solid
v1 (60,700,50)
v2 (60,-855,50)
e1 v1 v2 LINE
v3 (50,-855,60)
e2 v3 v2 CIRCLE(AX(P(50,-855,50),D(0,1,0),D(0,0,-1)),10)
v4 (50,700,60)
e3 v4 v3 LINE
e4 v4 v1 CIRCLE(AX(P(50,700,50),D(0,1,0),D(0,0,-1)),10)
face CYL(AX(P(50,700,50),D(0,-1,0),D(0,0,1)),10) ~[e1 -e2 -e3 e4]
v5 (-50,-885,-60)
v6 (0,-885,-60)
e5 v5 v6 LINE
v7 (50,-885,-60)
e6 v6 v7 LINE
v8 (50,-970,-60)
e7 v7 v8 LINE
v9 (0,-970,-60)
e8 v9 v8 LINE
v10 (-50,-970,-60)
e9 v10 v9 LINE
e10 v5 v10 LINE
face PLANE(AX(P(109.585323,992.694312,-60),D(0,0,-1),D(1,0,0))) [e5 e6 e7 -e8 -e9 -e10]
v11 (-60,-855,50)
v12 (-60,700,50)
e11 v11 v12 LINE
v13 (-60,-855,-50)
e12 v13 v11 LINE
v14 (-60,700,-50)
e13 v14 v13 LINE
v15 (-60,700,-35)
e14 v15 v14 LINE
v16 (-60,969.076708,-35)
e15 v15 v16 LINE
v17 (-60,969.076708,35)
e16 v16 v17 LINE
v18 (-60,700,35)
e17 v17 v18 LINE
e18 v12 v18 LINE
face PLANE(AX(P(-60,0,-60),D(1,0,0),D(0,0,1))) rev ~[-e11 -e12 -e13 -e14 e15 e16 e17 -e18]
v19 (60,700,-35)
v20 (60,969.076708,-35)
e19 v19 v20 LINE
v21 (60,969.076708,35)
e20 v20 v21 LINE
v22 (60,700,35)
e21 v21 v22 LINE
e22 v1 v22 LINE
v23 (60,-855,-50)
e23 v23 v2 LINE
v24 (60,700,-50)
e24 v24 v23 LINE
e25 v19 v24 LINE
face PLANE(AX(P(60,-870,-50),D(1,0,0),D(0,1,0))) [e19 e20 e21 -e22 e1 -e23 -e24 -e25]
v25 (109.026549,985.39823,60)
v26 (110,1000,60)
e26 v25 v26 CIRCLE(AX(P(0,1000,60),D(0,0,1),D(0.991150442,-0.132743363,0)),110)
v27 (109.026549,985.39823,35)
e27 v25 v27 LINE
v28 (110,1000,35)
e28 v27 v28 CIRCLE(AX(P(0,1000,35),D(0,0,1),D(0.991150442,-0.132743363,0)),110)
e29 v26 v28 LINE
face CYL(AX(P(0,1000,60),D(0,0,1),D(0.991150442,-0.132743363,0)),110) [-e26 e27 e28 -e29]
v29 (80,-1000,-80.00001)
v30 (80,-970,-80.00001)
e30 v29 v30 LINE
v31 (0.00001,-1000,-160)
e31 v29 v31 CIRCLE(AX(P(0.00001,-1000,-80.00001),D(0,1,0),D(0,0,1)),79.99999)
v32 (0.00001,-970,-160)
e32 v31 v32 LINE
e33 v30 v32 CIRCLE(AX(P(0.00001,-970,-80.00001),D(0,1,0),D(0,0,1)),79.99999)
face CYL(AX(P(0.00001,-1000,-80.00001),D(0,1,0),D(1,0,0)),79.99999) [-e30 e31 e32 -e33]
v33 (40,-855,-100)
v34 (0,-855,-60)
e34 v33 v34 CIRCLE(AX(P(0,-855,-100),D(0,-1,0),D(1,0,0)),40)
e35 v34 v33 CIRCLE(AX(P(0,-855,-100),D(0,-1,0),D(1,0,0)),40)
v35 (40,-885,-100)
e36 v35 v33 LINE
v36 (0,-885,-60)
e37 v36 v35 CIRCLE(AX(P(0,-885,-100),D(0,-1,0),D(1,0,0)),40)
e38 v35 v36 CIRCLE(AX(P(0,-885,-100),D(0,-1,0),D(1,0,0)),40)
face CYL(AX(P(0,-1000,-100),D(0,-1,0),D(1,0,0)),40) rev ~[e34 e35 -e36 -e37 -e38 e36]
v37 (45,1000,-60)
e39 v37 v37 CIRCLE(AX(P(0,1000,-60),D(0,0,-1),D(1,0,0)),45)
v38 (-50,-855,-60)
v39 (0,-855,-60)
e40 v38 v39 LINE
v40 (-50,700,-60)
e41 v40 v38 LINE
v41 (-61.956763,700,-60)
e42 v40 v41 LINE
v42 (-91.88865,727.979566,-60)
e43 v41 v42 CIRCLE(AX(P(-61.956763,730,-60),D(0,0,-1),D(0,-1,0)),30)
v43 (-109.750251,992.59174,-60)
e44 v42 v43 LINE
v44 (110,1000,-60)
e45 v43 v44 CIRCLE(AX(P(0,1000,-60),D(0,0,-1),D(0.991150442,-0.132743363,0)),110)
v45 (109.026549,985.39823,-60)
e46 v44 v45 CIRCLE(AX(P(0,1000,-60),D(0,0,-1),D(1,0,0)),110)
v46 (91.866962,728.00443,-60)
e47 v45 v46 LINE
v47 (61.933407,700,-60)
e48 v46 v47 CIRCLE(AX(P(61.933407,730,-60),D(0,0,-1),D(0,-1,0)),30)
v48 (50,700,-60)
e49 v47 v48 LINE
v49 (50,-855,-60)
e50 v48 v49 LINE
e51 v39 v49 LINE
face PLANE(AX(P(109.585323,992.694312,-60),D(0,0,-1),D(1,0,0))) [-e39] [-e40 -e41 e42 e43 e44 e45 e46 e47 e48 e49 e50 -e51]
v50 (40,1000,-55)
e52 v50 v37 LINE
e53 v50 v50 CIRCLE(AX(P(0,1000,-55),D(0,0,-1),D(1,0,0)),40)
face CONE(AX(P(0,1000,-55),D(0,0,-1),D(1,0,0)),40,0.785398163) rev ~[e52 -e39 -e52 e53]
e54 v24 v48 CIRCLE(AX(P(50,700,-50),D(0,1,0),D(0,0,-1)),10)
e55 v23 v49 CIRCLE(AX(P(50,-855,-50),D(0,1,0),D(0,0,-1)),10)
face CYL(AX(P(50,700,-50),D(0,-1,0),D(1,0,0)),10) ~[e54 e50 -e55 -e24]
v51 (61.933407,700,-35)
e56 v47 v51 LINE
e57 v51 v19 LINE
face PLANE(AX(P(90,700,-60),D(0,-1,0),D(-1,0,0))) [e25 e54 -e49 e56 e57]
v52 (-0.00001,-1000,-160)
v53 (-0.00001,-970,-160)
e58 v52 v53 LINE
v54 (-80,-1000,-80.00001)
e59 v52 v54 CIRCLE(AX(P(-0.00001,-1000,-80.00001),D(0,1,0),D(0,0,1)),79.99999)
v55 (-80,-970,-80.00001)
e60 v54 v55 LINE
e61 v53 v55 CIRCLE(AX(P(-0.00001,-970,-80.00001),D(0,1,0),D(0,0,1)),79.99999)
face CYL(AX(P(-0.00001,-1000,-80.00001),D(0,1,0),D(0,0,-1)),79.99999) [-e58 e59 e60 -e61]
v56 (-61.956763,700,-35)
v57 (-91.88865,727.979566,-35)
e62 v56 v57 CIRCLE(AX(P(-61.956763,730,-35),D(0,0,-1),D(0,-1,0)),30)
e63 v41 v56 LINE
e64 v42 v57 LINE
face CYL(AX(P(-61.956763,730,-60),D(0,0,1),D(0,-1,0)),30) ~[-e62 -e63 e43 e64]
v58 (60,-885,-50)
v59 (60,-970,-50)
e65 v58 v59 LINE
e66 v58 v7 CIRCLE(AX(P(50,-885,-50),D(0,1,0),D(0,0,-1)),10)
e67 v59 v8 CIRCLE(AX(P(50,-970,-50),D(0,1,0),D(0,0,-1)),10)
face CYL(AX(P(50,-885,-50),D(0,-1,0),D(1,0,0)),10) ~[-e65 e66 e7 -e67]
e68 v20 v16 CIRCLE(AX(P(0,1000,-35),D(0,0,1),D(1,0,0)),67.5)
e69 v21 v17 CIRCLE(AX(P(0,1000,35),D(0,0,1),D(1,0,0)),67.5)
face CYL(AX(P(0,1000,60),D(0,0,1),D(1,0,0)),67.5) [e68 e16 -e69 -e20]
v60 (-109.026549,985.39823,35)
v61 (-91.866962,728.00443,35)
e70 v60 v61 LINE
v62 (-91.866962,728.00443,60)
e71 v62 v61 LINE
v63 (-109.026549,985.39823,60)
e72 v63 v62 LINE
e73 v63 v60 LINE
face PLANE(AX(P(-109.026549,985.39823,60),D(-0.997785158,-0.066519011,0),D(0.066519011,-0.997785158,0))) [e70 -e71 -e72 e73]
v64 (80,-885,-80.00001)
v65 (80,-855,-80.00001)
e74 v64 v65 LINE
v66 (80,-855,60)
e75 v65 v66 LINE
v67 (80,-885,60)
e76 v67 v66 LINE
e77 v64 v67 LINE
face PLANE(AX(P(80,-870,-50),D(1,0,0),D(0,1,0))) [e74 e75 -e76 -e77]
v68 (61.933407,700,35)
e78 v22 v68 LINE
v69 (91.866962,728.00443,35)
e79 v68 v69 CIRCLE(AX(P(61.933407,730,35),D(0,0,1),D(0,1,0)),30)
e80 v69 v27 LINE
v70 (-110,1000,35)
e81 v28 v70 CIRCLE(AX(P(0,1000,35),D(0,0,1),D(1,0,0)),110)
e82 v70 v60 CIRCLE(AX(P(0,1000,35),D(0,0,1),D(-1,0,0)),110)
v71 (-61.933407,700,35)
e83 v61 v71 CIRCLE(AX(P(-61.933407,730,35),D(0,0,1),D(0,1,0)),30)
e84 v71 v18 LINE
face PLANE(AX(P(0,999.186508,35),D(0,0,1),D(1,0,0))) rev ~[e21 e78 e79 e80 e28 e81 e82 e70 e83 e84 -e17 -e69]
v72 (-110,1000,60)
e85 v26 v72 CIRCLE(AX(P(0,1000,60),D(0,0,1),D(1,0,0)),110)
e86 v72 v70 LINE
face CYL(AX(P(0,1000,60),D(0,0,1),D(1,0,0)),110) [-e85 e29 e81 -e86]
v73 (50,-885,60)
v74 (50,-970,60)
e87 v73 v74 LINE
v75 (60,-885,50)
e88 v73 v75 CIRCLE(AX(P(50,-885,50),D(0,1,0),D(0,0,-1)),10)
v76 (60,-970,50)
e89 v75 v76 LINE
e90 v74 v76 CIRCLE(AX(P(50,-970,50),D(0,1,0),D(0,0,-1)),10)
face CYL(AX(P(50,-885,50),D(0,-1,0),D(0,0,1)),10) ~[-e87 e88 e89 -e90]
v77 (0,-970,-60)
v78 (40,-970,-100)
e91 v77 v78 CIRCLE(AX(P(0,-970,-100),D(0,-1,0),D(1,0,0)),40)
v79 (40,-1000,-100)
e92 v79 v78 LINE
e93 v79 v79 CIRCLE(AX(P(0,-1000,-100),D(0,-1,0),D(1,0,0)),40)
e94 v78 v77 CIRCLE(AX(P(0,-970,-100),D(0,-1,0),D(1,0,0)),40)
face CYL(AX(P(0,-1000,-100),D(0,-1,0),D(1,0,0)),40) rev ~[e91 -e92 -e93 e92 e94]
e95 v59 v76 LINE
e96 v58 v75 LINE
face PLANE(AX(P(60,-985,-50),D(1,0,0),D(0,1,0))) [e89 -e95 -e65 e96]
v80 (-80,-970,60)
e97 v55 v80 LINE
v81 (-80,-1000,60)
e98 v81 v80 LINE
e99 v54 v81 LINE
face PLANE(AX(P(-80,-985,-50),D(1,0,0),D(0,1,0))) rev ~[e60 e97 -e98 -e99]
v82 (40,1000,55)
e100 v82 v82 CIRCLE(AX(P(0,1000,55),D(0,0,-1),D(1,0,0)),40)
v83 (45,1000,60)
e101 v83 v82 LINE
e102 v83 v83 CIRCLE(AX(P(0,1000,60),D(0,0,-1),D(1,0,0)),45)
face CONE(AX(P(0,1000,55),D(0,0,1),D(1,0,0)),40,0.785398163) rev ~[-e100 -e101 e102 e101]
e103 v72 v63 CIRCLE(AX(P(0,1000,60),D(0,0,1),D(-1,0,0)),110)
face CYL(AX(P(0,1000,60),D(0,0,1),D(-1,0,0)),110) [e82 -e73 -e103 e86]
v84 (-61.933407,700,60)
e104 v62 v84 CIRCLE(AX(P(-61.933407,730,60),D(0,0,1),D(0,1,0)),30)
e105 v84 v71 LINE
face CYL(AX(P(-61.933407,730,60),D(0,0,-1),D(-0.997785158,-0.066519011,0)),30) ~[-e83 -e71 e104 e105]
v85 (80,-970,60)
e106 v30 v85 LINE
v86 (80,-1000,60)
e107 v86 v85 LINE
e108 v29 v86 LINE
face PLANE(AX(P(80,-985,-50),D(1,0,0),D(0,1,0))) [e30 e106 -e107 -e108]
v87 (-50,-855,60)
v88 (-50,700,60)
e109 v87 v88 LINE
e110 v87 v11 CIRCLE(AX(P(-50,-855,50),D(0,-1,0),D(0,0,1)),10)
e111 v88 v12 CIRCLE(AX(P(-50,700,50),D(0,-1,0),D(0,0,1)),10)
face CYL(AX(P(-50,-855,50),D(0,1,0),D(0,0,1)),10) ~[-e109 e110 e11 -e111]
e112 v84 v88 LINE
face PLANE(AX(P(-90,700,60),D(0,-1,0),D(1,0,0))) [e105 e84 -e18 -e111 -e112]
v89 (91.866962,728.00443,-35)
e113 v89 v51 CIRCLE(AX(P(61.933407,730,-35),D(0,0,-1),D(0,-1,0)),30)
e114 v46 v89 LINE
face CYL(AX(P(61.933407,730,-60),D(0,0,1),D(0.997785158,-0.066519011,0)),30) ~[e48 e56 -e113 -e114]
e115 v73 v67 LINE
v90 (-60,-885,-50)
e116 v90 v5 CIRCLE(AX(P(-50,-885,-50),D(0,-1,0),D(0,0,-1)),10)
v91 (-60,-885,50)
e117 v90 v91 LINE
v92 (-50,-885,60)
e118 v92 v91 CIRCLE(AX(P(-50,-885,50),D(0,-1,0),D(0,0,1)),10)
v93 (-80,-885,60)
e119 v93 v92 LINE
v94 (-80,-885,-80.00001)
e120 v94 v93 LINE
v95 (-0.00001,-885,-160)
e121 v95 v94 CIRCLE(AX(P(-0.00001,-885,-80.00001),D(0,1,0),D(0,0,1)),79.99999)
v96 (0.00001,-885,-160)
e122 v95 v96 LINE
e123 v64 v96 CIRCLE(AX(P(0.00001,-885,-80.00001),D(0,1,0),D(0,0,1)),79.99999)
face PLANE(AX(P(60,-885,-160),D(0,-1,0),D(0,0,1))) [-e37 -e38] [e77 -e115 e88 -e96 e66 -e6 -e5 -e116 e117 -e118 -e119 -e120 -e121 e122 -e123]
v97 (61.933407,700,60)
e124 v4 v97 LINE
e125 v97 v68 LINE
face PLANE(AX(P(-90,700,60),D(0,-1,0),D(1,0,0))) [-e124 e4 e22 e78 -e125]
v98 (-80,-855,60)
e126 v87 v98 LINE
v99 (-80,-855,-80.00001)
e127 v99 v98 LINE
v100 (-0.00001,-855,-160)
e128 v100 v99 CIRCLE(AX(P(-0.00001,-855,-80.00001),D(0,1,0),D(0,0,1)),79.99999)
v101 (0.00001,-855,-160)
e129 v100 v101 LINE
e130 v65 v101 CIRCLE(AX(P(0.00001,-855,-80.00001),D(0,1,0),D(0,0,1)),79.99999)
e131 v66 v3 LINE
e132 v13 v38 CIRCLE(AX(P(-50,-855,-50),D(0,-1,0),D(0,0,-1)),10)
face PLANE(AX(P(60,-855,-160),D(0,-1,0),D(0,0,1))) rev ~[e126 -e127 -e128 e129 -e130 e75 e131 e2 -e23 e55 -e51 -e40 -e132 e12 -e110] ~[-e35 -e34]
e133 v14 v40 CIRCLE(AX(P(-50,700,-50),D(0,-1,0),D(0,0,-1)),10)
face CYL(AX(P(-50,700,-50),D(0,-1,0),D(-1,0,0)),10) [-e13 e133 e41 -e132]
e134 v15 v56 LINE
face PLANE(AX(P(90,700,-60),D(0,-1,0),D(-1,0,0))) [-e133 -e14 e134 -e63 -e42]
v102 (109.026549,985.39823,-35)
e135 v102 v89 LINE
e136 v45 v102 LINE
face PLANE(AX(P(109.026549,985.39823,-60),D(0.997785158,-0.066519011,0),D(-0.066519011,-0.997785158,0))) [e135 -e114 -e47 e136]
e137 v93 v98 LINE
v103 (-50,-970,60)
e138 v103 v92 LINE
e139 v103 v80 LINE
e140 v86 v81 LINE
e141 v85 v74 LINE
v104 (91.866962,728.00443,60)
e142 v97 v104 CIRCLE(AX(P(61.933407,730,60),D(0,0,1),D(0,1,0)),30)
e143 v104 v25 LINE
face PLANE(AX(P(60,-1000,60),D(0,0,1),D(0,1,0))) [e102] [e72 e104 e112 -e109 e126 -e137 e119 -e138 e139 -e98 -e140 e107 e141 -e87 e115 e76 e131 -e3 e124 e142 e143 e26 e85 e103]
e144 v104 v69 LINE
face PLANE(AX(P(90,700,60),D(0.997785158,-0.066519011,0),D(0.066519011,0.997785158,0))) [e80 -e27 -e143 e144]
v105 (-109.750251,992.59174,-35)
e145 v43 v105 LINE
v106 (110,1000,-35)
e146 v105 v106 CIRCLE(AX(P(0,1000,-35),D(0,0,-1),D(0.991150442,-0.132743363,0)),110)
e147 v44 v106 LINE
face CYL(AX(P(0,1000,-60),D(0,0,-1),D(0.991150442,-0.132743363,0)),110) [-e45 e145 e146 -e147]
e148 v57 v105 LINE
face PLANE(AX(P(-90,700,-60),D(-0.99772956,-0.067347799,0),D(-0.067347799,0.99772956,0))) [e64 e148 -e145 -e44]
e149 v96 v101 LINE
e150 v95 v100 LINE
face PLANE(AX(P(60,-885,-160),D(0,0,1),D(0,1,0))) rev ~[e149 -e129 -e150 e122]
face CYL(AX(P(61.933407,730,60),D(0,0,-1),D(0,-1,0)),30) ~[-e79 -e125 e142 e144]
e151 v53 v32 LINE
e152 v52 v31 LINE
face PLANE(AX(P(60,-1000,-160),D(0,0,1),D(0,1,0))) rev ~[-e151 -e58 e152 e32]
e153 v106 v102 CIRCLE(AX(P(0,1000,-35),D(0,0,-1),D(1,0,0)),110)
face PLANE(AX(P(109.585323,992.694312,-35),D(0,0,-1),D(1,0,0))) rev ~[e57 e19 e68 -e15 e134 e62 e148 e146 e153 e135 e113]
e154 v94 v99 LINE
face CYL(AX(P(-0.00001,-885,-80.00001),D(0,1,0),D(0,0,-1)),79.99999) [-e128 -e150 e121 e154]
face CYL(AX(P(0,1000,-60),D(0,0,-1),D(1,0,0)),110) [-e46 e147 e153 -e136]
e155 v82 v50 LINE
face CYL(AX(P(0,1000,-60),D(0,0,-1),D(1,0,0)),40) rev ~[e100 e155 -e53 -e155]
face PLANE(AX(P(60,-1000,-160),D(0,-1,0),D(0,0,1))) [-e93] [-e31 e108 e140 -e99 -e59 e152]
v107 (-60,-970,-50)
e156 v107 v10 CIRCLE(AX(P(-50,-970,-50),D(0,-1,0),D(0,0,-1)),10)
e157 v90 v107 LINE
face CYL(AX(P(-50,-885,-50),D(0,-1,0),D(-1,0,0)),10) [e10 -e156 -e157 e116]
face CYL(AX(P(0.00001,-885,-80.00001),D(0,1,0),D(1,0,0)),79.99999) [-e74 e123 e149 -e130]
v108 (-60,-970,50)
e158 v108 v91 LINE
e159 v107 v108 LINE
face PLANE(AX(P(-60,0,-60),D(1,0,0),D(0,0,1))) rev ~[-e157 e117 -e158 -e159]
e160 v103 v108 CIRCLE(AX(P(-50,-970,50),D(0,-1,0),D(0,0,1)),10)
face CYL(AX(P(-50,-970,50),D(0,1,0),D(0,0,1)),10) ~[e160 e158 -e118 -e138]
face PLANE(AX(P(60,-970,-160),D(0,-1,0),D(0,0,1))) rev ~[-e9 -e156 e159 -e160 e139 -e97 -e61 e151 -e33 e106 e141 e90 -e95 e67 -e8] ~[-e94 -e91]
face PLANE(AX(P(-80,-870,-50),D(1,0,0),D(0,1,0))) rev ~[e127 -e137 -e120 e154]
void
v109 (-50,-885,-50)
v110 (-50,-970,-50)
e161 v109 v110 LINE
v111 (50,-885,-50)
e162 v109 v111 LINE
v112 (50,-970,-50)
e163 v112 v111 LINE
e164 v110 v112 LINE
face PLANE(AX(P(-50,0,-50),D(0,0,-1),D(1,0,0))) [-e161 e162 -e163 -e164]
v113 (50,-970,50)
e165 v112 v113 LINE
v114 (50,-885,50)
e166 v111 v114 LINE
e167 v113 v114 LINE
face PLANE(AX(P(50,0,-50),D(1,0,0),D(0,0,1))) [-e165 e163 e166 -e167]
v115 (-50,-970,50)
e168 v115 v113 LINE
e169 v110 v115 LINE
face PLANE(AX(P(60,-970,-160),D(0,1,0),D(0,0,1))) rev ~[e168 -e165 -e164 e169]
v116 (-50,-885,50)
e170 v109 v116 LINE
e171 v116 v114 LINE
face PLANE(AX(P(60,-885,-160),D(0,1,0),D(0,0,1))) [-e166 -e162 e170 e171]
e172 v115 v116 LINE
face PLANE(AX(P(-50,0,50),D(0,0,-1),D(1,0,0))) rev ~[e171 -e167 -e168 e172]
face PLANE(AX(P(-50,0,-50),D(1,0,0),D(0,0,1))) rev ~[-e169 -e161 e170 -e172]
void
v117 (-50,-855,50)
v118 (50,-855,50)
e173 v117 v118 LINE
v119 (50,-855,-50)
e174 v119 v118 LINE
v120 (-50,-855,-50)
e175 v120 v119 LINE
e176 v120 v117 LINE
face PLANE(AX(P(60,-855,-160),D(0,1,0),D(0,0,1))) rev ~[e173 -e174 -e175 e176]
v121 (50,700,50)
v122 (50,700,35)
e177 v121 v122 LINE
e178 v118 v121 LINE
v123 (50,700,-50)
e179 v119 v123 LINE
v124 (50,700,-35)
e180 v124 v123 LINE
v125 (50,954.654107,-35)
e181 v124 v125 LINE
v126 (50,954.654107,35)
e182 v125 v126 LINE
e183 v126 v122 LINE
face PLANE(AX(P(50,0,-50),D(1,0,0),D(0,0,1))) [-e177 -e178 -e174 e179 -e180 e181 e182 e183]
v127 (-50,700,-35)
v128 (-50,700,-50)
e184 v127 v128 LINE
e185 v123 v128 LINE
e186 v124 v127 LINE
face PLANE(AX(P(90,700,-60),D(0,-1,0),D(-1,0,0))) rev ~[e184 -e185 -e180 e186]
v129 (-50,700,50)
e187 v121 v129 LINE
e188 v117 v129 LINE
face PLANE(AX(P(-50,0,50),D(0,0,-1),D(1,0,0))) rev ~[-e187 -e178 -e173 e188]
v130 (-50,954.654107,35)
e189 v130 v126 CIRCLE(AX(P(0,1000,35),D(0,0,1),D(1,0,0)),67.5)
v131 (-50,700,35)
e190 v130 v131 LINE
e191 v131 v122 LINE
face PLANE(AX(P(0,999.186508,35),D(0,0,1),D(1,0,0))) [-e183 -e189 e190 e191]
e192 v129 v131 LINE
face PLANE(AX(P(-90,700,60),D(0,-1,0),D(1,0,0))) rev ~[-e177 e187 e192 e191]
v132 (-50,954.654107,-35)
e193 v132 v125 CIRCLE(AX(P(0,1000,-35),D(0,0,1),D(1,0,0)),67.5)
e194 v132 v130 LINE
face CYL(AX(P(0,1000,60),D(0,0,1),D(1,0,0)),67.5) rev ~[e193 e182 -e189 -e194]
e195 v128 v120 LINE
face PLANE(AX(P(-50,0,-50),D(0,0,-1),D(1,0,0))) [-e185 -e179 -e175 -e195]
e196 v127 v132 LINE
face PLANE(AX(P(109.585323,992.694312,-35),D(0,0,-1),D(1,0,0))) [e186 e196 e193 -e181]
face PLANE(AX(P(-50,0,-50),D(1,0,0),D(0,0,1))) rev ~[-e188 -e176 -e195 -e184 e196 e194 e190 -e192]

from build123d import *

# Parameters (mm, degrees)
F0_W      = 120
F0_H      = 120
F0_W_2    = 100
F0_H_2    = 100
F1_DEPTH  = 1000
F2_R      = 67.5
F3_DEPTH  = 120
F4_R      = 40
F5_DEPTH  = 120
F7_DEPTH  = 25
F9_DEPTH  = 25
F10_R     = 40
F11_DEPTH = 160
F12_W     = 30
F12_H     = 220
F13_DEPTH = 140
F14_W     = 30
F14_H     = 220
F15_DEPTH = 20
F16_W     = 30
F16_H     = 220
F17_DEPTH = 140
F18_W     = 30
F18_H     = 220
F19_DEPTH = 20
F20_R     = 40
F21_DEPTH = 145
F22_R     = 10
F23_R     = 79.99999
F24_R     = 30
F25_SIZE  = 5


# Not quite as in the source:
# - a fillet or chamfer is up to 0.001 mm smaller than in the source, because OpenCascade refuses the exact size


with BuildPart() as f1:
    # F0 (on Front) → F1 (new body, symmetric)
    with BuildSketch(Plane.XZ):
        Rectangle(F0_W, F0_H)
        Rectangle(F0_W_2, F0_H_2, mode=Mode.SUBTRACT)
    extrude(amount=F1_DEPTH, both=True)

    # F2 (on face) → F3 (join)
    with BuildSketch(Plane.XY.offset(60)):
        with Locations((0, 1000)):
            Circle(F2_R)
    extrude(amount=-F3_DEPTH)

    # F4 (on face) → F5 (cut)
    with BuildSketch(Plane.XY.offset(60)):
        with Locations((0, 1000)):
            Circle(F4_R)
    extrude(amount=-F5_DEPTH, mode=Mode.SUBTRACT)

    # F6 (on face) → F7 (join)
    with BuildSketch(Plane.XY.offset(60)):
        with BuildLine():
            Line((109.0265486726, 985.3982300885), (110, 1000))
            ThreePointArc((110, 1000), (0, 1110), (-110, 1000))
            Line((-110, 1000), (-109.0265486726, 985.3982300885))
            ThreePointArc((-109.0265486726, 985.3982300885), (0, 890), (109.0265486726, 985.3982300885))
        make_face()
        with BuildLine():
            ThreePointArc((109.0265486726, 985.3982300885), (109.7563673642, 992.6829088424), (110, 1000))
            Line((110, 1000), (109.0265486726, 985.3982300885))
        make_face()
        with BuildLine():
            Line((-109.0265486726, 985.3982300885), (-110, 1000))
            ThreePointArc((-110, 1000), (-109.7563673642, 992.6829088424), (-109.0265486726, 985.3982300885))
        make_face()
        with BuildLine():
            Line((90, 700), (109.0265486726, 985.3982300885))
            ThreePointArc((109.0265486726, 985.3982300885), (0, 890), (-109.0265486726, 985.3982300885))
            Line((-109.0265486726, 985.3982300885), (-90, 700))
            Line((-90, 700), (90, 700))
        make_face()
    extrude(amount=-F7_DEPTH)

    # F8 (on face) → F9 (join)
    with BuildSketch(Plane(origin=(0, 0, -60), x_dir=(1, 0, 0), z_dir=(0, 0, -1))):
        with BuildLine():
            Line((109.0265486726, -985.3982300885), (110, -1000))
            ThreePointArc((110, -1000), (109.7563673642, -992.6829088424), (109.0265486726, -985.3982300885))
        make_face()
        with BuildLine():
            ThreePointArc((-109.7502513746, -992.5917395282), (-3.706234531, -1109.9375451136), (110, -1000))
            Line((110, -1000), (109.0265486726, -985.3982300885))
            ThreePointArc((109.0265486726, -985.3982300885), (-3.6149109138, -890.0594141407), (-109.7502513746, -992.5917395282))
        make_face()
        with BuildLine():
            ThreePointArc((-109.7502513746, -992.5917395282), (-3.6149109138, -890.0594141407), (109.0265486726, -985.3982300885))
            Line((109.0265486726, -985.3982300885), (90, -700))
            Line((90, -700), (-90, -700))
            Line((-90, -700), (-109.7502513746, -992.5917395282))
        make_face()
    extrude(amount=-F9_DEPTH)

    # F10 (on face) → F11 (cut)
    with BuildSketch(Plane(origin=(0, 0, -60), x_dir=(1, 0, 0), z_dir=(0, 0, -1))):
        with Locations((0, -1000)):
            Circle(F10_R)
    extrude(amount=-F11_DEPTH, mode=Mode.SUBTRACT)

    # F12 (on face) → F13 (join)
    with BuildSketch(Plane.YZ.offset(60)):
        with Locations((-870, -50)):
            Rectangle(F12_W, F12_H)
    extrude(amount=-F13_DEPTH)

    # F14 (on face) → F15 (join)
    with BuildSketch(Plane.YZ.offset(60)):
        with Locations((-870, -50)):
            Rectangle(F14_W, F14_H)
    extrude(amount=F15_DEPTH)

    # F16 (on face) → F17 (join)
    with BuildSketch(Plane.YZ.offset(60)):
        with Locations((-985, -50)):
            Rectangle(F16_W, F16_H)
    extrude(amount=-F17_DEPTH)

    # F18 (on face) → F19 (join)
    with BuildSketch(Plane.YZ.offset(60)):
        with Locations((-985, -50)):
            Rectangle(F18_W, F18_H)
    extrude(amount=F19_DEPTH)

    # F20 (on face) → F21 (cut)
    with BuildSketch(Plane.XZ.offset(1000)):
        with Locations((0, -100)):
            Circle(F20_R)
    extrude(amount=-F21_DEPTH, mode=Mode.SUBTRACT)

    # F22
    f22_edges = [f1.edges().sort_by_distance(p)[0] for p in [
        (60, -77.5, 60),
        (60, -77.5, -60),
        (60, -927.5, -60),
        (60, -927.5, 60),
        (-60, -77.5, 60),
        (-60, -927.5, 60),
        (-60, -927.5, -60),
        (-60, -77.5, -60),
    ]]
    fillet(f22_edges, radius=F22_R)

    # F23 (radius 80 in the source; OpenCascade refuses exactly that, so slightly less here)
    f23_edges = [f1.edges().sort_by_distance(p)[0] for p in [
        (-80, -985, -160),
        (80, -985, -160),
        (80, -870, -160),
        (-80, -870, -160),
    ]]
    fillet(f23_edges, radius=F23_R)

    # F24
    f24_edges = [f1.edges().sort_by_distance(p)[0] for p in [
        (-90, 700, -47.5),
        (-90, 700, 47.5),
        (90, 700, -47.5),
        (90, 700, 47.5),
    ]]
    fillet(f24_edges, radius=F24_R)

    # F25
    f25_edges = [f1.edges().sort_by_distance(p)[0] for p in [
        (-40, 1000, 60),
        (-40, 1000, -60),
    ]]
    chamfer(f25_edges, length=F25_SIZE)


solid = f1.part
